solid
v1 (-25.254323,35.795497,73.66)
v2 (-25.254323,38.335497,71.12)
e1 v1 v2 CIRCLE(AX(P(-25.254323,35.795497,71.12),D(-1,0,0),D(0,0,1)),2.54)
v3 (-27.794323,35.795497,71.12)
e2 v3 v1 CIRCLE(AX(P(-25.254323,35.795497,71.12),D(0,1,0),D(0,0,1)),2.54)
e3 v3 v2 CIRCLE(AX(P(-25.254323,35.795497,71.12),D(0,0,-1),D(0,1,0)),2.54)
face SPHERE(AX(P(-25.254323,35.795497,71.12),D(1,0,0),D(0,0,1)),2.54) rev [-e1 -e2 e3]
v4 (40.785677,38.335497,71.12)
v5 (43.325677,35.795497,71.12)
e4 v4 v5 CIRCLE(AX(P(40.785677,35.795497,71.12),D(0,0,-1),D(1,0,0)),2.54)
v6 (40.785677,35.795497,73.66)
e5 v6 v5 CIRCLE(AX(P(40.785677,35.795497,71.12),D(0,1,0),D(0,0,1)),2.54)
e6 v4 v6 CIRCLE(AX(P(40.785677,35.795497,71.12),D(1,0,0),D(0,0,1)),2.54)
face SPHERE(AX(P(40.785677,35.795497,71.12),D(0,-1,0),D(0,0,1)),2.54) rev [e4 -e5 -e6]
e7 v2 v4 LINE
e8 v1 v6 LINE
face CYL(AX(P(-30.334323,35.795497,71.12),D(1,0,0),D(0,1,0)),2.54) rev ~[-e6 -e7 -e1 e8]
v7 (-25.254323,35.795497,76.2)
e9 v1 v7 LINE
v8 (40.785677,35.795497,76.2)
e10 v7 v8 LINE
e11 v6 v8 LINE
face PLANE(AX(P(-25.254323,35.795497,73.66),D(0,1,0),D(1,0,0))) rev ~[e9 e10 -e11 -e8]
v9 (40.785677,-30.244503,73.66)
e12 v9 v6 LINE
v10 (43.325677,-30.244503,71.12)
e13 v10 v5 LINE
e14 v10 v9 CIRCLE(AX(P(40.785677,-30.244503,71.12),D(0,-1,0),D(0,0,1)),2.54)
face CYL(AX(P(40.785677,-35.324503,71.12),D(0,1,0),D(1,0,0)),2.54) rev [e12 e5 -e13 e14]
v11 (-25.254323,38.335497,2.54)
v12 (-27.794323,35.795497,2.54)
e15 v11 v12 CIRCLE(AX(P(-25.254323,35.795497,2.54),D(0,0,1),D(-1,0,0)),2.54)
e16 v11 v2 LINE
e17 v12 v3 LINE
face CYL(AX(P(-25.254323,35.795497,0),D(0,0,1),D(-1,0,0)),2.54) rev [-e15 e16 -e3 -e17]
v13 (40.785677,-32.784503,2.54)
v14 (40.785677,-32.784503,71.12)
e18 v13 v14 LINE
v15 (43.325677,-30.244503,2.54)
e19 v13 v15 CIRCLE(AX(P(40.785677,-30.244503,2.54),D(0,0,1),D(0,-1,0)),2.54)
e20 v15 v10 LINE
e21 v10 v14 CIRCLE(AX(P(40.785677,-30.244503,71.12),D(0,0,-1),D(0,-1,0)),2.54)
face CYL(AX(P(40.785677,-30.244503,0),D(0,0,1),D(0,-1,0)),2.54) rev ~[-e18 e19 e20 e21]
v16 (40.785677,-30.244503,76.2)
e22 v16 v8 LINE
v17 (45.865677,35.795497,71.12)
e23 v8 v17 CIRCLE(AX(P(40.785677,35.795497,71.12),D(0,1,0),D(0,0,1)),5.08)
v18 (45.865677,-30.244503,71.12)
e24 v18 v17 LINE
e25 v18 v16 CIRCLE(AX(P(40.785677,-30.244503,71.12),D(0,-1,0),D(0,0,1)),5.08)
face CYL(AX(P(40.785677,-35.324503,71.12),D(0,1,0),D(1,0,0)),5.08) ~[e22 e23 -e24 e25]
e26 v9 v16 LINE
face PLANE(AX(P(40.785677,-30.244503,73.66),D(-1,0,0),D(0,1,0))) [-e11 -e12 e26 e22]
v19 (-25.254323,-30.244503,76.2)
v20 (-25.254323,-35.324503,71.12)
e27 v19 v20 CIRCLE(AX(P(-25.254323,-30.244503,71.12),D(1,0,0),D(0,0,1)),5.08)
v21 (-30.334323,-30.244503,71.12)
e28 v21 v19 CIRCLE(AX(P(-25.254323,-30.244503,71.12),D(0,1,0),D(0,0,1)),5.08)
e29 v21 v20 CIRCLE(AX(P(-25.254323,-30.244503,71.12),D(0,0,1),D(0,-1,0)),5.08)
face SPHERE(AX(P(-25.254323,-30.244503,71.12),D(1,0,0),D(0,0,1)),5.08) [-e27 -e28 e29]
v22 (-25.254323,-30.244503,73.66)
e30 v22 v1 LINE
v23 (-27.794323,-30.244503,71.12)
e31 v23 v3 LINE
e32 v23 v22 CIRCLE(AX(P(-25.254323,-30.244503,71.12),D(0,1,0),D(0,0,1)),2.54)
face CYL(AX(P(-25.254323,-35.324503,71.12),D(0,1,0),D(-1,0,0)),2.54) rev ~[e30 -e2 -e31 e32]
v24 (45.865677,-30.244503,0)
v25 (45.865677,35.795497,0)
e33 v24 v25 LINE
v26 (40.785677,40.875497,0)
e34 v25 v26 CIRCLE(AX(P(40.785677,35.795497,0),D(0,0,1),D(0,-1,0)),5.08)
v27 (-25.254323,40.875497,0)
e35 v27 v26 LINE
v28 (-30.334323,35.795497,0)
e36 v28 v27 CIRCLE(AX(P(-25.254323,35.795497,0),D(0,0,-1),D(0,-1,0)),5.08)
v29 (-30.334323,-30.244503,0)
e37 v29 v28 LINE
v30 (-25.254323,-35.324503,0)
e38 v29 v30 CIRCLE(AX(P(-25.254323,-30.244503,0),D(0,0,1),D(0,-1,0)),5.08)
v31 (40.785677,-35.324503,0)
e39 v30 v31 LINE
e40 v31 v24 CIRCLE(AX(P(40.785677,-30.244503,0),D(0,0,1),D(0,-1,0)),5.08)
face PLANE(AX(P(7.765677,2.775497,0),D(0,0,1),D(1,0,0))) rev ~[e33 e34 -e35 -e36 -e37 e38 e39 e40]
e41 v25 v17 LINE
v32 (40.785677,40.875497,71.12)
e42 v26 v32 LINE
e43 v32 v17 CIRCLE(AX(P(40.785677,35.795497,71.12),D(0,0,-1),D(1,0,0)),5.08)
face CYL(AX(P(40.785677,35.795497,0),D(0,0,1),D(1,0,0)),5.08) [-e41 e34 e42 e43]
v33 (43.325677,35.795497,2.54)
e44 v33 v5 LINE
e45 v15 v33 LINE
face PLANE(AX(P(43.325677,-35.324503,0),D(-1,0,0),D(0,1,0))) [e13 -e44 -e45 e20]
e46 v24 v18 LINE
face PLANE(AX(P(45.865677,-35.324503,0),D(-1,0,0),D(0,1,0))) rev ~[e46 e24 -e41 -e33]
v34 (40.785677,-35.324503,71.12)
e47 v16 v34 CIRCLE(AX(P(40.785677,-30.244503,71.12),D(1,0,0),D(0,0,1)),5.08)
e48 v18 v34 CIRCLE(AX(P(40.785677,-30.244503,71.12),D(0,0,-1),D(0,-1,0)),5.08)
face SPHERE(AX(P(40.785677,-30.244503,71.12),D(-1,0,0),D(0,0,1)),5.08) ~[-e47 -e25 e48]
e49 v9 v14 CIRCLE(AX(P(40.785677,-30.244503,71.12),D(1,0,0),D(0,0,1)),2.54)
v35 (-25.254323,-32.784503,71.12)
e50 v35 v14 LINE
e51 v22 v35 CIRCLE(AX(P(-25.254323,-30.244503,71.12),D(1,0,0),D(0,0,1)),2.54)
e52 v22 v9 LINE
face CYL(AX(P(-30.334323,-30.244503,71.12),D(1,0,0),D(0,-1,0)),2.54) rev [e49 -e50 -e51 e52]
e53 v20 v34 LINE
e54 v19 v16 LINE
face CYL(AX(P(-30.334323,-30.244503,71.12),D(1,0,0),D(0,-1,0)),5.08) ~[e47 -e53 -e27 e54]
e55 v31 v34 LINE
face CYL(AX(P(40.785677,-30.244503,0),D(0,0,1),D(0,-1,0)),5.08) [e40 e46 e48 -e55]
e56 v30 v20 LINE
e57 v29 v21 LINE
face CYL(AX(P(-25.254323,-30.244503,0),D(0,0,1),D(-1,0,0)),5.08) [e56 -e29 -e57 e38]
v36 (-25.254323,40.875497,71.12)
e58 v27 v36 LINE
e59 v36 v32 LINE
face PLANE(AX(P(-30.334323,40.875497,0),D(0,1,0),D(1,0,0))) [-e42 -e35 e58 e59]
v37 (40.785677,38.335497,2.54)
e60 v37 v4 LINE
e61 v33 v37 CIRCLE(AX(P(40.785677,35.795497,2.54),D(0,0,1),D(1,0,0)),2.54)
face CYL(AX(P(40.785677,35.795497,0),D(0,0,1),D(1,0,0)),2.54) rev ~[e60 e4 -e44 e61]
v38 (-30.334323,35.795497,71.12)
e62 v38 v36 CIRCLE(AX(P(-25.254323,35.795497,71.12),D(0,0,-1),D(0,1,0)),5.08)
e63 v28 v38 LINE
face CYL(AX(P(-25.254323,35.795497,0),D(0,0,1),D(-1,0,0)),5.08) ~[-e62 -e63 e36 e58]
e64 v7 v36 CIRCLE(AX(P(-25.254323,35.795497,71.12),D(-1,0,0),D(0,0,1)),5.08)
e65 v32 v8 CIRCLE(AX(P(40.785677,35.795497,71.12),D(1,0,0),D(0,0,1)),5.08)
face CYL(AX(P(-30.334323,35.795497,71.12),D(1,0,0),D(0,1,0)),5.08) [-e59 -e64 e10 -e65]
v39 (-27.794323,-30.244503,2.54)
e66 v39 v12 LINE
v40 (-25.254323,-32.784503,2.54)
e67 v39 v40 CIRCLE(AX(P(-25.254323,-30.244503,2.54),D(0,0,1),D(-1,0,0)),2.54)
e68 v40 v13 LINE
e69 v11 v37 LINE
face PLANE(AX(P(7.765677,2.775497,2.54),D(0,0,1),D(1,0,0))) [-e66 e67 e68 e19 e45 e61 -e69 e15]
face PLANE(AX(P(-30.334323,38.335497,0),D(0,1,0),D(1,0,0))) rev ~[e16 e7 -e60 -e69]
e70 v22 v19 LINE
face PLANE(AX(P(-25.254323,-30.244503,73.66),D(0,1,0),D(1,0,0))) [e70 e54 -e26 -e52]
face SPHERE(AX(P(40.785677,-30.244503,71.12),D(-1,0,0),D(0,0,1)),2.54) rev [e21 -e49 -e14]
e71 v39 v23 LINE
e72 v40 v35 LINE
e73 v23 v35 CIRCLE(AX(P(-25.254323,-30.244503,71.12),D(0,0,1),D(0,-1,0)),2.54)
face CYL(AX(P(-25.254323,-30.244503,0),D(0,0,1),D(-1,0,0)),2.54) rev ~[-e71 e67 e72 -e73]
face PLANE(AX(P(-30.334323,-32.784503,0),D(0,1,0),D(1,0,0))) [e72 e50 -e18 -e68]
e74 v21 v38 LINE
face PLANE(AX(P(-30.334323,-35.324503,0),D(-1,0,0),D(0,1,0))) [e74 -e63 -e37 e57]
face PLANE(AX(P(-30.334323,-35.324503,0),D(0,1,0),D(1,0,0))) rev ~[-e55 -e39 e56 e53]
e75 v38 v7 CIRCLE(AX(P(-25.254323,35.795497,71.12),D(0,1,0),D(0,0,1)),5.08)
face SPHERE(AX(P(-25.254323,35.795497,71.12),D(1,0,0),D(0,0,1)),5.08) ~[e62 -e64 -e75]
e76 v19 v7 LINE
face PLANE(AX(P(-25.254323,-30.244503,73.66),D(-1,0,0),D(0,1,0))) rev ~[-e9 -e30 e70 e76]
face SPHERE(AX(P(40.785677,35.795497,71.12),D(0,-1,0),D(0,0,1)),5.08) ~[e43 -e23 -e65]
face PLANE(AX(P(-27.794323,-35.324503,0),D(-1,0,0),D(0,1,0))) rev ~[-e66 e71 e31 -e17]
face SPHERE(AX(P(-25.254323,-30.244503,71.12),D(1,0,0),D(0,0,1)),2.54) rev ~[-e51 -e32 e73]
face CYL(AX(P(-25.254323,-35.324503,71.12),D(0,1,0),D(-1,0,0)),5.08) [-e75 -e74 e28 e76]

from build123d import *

# Parameters (mm, degrees)
F0_W     = 76.2
F0_H     = 76.2
F1_DEPTH = 76.2
F2_R     = 5.08
F3_T     = -2.54


# Not quite as in the source:
# - a shell that OpenCascade refuses in one call is made with other operations: the cavity is built on its own and cut out


with BuildPart() as f1:
    # F0 (on Top) → F1 (new body)
    with BuildSketch(Plane.XY):
        with Locations((7.7656768262, 2.775496821)):
            Rectangle(F0_W, F0_H)
    extrude(amount=F1_DEPTH)

    # F2
    f2_edges = [f1.edges().sort_by_distance(p)[0] for p in [
        (7.765677, -35.324503, 76.2),
        (45.865677, 2.775497, 76.2),
        (7.765677, 40.875497, 76.2),
        (-30.334323, 2.775497, 76.2),
        (45.865677, -35.324503, 38.1),
        (-30.334323, -35.324503, 38.1),
        (45.865677, 40.875497, 38.1),
        (-30.334323, 40.875497, 38.1),
    ]]
    fillet(f2_edges, radius=F2_R)

    # F3: a shell. OpenCascade refuses it in one call, so the cavity is built on its own and cut out:
    # the body offset inwards by the wall thickness, plus a prism from it out through each open face.
    f3_core = offset(f1.part, amount=F3_T, mode=Mode.PRIVATE)
    f3_exits = [f3_core.faces().sort_by_distance(p)[0] for p in [
        (7.765677, 2.775497, 73.66),
    ]]
    add(f3_core, mode=Mode.SUBTRACT)
    extrude(f3_exits, amount=-F3_T, mode=Mode.SUBTRACT)


solid = f1.part
